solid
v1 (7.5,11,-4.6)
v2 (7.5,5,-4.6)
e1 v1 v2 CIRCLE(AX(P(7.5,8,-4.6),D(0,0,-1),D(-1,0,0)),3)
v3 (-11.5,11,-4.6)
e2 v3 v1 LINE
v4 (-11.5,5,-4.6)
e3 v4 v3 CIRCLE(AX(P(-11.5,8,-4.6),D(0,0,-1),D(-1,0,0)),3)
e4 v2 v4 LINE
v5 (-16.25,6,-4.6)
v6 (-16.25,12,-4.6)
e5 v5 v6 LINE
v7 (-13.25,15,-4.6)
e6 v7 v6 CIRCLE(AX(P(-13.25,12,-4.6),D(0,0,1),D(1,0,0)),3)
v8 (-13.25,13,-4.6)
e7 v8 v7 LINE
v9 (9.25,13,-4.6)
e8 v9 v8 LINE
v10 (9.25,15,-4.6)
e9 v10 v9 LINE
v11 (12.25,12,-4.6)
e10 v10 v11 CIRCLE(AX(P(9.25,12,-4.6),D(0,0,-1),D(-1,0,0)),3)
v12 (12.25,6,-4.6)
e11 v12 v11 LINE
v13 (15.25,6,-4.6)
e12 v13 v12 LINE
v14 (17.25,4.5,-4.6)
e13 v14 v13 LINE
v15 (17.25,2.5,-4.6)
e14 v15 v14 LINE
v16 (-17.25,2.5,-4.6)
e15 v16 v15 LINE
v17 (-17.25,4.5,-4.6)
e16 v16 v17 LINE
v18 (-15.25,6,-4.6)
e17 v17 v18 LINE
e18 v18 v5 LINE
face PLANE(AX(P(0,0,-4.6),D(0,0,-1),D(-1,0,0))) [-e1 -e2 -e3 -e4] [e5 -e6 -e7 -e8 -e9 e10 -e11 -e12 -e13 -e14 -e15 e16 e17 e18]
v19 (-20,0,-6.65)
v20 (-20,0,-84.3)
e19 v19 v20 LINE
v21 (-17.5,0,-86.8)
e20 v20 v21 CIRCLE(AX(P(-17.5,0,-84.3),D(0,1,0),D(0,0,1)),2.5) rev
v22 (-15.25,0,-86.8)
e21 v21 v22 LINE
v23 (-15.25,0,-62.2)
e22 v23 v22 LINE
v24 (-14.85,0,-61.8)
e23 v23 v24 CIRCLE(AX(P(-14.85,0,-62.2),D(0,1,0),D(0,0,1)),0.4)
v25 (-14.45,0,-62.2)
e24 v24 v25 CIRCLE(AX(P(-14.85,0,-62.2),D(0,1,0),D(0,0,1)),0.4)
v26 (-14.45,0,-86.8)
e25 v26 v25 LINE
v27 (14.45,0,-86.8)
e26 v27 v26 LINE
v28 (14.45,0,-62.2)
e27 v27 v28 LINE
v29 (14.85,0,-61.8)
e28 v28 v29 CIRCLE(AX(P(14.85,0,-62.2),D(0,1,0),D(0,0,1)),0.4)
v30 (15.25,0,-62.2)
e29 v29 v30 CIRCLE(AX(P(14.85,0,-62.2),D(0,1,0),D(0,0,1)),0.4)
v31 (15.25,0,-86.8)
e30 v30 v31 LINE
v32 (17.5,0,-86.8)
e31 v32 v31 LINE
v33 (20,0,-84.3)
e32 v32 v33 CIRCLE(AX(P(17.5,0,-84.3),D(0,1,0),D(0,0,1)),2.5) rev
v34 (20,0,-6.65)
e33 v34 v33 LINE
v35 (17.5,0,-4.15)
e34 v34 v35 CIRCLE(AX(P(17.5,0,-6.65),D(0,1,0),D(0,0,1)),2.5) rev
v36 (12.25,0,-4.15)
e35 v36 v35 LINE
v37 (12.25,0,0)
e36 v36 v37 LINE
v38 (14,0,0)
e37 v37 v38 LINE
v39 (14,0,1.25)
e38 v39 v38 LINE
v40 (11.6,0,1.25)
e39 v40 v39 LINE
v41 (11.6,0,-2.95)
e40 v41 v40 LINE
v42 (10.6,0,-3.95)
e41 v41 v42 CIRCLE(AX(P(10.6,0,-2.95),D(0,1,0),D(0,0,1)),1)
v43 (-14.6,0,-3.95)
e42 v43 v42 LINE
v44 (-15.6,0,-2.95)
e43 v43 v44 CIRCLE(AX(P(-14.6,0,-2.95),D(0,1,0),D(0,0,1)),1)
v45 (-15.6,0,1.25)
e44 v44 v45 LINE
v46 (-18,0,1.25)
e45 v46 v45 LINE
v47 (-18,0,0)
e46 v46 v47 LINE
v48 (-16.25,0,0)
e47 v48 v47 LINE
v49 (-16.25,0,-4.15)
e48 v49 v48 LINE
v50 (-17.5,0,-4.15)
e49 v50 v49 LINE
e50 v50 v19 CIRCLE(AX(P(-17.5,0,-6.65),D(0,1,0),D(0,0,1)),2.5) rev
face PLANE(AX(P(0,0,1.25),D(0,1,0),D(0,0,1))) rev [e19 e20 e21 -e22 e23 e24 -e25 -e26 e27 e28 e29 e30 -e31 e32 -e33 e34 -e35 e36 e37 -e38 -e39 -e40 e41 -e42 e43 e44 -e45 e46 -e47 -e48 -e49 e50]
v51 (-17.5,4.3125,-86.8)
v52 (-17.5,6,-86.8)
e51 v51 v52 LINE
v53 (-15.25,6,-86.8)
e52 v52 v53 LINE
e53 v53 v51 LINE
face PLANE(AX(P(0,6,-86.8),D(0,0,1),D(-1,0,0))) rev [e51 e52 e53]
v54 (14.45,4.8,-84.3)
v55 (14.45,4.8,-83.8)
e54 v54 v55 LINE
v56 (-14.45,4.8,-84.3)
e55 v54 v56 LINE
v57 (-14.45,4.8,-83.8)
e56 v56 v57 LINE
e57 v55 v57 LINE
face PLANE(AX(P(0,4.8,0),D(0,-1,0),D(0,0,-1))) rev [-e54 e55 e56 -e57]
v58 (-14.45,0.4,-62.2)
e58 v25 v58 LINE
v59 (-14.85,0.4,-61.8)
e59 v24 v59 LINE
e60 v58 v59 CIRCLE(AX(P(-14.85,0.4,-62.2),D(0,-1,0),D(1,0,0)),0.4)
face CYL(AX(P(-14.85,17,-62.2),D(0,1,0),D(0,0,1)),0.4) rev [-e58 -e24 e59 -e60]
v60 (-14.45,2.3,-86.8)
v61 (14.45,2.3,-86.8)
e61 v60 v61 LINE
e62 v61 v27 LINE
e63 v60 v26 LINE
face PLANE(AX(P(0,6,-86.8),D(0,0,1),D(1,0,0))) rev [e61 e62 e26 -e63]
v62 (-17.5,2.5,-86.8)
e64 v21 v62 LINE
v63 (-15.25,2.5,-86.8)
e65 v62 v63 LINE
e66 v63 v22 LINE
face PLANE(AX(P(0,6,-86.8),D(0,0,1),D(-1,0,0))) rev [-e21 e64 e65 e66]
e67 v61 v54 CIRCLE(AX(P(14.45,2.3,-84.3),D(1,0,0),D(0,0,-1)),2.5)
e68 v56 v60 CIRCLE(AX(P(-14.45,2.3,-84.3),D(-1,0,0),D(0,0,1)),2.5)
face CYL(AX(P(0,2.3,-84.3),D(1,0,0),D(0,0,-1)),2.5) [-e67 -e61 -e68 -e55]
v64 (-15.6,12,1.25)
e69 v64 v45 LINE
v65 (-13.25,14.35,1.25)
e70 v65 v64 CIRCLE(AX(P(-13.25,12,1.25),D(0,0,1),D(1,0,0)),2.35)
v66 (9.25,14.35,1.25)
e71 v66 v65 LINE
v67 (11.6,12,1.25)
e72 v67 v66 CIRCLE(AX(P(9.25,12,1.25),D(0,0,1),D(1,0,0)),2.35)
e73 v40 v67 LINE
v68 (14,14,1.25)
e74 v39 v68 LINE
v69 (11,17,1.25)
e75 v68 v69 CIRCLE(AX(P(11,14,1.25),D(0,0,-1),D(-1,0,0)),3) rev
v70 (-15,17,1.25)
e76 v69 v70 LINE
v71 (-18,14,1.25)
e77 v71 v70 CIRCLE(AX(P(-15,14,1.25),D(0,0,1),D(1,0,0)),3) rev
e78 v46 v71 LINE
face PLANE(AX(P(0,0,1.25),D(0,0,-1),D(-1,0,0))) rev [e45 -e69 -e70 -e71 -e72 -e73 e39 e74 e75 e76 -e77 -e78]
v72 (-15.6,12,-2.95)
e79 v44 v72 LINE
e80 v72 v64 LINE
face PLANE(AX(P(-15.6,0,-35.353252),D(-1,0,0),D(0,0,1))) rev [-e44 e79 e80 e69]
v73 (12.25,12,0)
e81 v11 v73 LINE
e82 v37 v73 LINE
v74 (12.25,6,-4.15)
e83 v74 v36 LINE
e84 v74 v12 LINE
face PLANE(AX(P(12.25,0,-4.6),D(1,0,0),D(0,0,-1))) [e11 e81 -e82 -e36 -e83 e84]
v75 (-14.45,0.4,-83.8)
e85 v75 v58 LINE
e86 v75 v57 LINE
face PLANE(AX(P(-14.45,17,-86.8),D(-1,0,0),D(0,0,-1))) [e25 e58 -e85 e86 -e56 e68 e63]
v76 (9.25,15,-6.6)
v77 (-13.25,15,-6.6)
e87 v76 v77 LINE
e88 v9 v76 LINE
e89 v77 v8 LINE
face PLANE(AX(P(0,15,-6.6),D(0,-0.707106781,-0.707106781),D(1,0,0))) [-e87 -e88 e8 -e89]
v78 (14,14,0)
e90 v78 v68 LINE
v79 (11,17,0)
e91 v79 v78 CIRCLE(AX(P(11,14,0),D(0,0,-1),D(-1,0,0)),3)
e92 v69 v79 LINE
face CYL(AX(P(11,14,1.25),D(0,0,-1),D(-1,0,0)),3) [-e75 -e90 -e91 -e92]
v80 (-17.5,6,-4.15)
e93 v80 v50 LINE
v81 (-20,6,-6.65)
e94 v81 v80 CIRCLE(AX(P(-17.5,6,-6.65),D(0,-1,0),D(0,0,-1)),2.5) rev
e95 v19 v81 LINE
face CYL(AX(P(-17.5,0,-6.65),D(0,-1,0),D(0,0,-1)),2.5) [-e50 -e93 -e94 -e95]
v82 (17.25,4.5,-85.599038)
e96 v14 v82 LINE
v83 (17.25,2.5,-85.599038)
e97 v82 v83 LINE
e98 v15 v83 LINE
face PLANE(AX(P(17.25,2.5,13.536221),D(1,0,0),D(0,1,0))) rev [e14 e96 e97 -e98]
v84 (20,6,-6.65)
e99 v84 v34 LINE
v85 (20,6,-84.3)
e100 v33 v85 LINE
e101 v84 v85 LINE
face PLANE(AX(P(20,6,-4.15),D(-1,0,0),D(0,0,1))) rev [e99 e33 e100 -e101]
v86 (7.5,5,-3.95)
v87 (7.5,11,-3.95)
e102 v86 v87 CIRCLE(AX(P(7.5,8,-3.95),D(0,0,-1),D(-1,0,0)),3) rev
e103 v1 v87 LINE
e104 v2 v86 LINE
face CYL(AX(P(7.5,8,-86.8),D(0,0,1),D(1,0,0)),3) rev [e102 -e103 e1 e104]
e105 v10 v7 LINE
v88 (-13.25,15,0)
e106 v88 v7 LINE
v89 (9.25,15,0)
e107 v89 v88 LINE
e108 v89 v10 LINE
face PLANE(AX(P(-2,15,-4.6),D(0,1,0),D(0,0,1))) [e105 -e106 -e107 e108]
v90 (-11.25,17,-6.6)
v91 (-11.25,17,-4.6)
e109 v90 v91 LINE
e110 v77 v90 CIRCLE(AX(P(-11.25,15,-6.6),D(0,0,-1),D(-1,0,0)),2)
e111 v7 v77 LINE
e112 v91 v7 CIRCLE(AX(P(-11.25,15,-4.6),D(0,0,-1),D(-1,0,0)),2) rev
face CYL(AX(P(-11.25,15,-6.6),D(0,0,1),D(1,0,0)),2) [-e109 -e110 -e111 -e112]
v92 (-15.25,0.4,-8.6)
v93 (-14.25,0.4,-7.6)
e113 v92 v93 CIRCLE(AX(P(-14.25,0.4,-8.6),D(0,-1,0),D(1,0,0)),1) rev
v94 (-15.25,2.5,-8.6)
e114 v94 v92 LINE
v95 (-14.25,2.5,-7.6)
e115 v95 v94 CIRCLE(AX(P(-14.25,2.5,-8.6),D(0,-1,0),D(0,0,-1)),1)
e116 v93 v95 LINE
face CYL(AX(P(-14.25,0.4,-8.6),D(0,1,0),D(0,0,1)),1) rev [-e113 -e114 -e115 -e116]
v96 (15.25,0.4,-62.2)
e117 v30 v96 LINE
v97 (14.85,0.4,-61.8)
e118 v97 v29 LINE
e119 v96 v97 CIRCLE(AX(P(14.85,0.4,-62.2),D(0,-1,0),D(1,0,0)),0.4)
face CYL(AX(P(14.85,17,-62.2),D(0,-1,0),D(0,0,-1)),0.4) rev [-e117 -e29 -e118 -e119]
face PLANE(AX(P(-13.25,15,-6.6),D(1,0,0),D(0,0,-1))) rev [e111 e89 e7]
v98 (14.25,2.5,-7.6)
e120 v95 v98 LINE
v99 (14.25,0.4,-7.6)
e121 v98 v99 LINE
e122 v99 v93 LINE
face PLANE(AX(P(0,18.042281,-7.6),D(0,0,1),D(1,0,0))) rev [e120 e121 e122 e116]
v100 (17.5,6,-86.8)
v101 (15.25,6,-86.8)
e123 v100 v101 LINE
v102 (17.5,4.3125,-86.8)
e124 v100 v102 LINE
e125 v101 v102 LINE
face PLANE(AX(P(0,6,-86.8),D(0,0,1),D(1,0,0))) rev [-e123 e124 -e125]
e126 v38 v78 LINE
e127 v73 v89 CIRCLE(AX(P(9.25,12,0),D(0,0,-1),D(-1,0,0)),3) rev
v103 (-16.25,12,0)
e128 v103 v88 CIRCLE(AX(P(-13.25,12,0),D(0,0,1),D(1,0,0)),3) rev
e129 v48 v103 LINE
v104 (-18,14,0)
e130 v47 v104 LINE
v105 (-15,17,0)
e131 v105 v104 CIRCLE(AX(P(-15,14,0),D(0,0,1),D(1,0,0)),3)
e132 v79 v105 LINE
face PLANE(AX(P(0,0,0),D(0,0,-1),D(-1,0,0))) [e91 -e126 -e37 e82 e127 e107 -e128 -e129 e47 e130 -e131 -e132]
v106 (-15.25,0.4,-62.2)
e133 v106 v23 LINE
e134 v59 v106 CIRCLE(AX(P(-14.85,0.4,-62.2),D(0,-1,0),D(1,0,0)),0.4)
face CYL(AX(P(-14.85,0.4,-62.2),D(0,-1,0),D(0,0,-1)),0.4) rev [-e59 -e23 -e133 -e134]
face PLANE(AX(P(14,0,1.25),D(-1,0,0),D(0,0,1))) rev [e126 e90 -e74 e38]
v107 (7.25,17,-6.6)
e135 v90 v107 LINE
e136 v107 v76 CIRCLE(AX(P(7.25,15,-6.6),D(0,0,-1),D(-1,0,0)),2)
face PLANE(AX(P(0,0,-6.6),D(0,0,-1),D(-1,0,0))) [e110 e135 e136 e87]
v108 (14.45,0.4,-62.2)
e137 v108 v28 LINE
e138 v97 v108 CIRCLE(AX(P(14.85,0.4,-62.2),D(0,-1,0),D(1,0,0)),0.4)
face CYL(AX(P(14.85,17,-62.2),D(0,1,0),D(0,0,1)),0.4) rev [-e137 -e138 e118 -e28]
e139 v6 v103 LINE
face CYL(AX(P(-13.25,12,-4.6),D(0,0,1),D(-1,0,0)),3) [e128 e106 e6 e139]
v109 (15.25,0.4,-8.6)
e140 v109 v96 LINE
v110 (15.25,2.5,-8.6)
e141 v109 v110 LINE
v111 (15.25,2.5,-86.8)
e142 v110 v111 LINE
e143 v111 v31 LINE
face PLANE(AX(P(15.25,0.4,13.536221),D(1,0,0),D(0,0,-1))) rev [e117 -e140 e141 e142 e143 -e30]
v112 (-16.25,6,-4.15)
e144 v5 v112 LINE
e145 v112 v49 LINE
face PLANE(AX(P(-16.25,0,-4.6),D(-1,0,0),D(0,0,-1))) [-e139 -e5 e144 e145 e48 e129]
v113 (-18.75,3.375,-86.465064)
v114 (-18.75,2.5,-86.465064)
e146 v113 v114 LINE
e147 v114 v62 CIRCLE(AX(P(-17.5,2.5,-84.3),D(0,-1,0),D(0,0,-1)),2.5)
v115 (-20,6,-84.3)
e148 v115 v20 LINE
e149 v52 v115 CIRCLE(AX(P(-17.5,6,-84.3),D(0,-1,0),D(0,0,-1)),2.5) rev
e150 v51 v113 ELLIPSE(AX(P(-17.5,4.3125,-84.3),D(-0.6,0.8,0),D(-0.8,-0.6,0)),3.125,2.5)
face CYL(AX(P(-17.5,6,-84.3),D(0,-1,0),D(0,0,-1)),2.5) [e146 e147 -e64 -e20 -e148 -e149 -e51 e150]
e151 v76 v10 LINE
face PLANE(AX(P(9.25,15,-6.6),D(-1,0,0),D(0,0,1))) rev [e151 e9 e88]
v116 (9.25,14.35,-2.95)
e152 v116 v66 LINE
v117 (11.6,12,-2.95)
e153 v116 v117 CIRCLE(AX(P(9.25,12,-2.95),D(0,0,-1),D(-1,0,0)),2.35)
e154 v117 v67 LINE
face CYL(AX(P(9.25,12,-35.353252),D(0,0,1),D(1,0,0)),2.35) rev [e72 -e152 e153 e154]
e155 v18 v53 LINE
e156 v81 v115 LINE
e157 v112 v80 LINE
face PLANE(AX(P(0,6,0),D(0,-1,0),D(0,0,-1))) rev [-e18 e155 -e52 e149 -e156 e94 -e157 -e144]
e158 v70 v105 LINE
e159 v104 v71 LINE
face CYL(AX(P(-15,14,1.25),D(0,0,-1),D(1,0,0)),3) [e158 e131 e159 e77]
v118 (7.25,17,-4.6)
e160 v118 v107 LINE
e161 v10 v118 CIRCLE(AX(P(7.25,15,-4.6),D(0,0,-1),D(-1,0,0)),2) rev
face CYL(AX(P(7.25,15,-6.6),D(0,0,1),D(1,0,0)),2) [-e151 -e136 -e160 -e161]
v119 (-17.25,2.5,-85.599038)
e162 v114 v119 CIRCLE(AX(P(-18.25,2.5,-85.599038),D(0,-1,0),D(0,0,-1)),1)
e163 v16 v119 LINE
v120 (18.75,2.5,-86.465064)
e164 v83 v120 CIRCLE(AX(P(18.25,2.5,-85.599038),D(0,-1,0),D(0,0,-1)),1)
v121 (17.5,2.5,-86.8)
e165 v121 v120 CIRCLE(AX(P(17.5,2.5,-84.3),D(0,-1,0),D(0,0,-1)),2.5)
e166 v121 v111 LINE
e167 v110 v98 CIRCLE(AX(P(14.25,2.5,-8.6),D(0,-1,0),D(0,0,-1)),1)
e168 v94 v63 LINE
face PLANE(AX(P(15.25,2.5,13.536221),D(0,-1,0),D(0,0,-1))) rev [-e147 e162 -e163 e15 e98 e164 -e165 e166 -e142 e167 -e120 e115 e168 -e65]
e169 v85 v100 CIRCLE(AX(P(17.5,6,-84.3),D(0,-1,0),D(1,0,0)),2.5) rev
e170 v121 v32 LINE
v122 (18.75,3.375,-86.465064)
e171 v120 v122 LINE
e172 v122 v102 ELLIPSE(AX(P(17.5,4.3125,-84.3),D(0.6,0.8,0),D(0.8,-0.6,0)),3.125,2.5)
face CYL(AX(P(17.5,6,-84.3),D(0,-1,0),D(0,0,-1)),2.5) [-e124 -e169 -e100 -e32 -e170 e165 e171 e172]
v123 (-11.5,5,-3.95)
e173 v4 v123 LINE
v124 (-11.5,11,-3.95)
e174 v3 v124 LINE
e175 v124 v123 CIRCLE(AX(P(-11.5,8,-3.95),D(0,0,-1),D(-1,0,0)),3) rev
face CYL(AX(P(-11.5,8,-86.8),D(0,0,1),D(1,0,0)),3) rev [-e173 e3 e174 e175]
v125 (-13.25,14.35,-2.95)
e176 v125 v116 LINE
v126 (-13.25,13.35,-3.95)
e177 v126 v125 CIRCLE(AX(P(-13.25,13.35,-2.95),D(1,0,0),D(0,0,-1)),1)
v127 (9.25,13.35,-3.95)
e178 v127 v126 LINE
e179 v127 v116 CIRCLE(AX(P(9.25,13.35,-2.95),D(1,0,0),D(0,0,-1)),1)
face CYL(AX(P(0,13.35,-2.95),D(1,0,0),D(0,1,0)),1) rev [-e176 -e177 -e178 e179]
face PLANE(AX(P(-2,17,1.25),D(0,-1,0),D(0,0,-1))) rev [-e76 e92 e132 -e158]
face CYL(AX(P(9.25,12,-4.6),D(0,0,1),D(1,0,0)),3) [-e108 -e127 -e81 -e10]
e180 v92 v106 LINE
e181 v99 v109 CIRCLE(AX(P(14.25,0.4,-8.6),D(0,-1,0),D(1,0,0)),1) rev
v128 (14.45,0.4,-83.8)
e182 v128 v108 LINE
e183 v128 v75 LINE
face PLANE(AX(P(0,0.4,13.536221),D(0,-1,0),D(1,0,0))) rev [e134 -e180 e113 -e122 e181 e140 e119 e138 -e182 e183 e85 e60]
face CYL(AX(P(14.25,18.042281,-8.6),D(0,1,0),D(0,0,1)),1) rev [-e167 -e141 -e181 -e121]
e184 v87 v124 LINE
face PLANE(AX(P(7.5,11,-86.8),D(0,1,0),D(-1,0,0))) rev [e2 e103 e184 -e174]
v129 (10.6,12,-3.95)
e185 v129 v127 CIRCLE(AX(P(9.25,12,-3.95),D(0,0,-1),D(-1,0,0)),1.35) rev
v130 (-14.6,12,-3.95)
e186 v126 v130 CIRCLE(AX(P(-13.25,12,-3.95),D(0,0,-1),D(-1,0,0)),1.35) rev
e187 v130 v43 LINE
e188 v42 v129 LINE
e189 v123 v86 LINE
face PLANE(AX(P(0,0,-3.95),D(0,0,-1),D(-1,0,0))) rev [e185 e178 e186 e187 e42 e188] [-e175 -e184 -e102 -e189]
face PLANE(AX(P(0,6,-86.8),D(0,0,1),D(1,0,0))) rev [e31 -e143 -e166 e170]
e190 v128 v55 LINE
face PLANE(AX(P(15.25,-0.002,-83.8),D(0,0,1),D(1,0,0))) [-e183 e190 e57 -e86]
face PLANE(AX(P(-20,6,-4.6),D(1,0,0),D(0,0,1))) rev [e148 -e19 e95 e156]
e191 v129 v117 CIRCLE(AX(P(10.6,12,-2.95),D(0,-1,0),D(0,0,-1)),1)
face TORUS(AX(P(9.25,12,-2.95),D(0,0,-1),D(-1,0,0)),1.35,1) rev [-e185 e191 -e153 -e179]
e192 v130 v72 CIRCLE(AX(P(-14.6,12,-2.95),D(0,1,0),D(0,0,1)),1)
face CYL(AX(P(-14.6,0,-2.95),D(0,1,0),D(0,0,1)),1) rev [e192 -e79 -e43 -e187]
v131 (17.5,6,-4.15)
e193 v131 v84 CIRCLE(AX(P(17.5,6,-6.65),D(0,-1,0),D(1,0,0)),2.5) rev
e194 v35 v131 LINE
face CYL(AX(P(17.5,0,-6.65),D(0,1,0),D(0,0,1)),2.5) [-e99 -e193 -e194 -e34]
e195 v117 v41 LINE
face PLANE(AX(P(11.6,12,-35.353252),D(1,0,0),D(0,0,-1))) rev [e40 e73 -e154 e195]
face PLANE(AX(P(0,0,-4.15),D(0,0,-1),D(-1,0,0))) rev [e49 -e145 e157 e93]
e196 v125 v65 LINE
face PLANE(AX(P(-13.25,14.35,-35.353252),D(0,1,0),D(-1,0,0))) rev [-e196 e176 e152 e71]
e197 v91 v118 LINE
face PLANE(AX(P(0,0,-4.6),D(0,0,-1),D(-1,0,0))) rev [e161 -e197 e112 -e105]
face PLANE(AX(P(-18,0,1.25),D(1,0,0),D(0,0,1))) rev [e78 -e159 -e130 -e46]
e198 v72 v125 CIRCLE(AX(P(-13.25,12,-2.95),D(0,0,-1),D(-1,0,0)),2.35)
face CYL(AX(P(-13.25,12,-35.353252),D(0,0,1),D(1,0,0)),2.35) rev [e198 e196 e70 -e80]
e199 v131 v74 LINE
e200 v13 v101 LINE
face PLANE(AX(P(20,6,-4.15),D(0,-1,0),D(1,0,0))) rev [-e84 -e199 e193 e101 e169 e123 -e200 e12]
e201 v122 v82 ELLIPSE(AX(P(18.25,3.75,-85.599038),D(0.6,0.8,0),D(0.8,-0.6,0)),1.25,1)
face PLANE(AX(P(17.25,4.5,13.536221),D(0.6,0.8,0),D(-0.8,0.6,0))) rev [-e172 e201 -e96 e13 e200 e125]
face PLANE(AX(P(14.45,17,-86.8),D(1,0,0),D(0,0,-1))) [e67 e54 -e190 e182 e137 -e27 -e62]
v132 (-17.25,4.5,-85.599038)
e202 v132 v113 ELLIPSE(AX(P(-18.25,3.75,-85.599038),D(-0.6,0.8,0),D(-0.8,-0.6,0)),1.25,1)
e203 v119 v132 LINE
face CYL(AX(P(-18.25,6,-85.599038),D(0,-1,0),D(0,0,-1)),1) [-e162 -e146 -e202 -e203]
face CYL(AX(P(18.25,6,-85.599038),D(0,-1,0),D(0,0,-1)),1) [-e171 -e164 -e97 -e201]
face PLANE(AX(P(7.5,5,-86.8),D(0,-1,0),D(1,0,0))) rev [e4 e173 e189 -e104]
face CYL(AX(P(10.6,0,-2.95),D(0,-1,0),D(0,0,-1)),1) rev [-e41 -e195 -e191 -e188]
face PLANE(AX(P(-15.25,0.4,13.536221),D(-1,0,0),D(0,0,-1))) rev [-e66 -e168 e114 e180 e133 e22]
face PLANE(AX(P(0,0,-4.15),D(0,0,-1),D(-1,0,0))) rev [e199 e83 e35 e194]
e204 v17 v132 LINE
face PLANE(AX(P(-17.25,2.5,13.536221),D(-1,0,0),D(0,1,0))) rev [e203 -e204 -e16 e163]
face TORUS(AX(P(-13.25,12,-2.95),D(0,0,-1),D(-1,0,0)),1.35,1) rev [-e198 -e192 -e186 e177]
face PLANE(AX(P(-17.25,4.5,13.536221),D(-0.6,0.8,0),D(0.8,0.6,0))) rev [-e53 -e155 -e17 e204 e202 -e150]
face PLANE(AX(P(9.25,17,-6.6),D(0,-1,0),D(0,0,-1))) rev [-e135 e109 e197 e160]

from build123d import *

# Parameters (mm, degrees)
BOSS_EXTRUDE1_DEPTH      = 1.25
SKETCH2_W                = 14.25
SKETCH2_H                = 15
BOSS_EXTRUDE2_DEPTH      = 4.6
FILLET1_R                = 3
SKETCH5_W                = 20
SKETCH5_H                = 82.2
BASE_PLATE_DEPTH         = 6
SLOT_CUT_DEPTH           = 82.2
REAR_TAB_DEPTH           = 4.4
REAR_TAB_DEPTH_BACK      = 0.4
SKETCH8_W                = 15.25
SKETCH8_H                = 3
SKETCH22_W               = 15.25
SKETCH22_H               = 3
FRONT_SUPPORT_RAIL_DEPTH = 2.1
SKETCH23_W               = 0.8
SKETCH23_H               = 25
BEND_SLOT_DEPTH          = 91.682082023
SKETCH20_W               = 7.75
SKETCH20_H               = 6
SKETCH20_W_2             = 4.75
BOSS_EXTRUDE3_DEPTH      = 0.45
FILLET6_R                = 2.5
CUT_EXTRUDE4_DEPTH       = 92.879282213
CUT_EXTRUDE5_DEPTH       = 5.2
FILLET5_R                = 1
FILLET7_R                = 0.4
BOSS_EXTRUDE4_DEPTH      = 2
CHAMFER1_SIZE            = 2
FILLET8_R                = 2


# Some blends are built 0.0001 mm under size
with BuildPart() as part:
    # Sketch1 → Boss-Extrude1 (new body)
    with BuildSketch(Plane.XY):
        Polygon((0, 0), (14, 0), (14, 17), (-2, 17), (-2, 0), align=None)
    extrude(amount=BOSS_EXTRUDE1_DEPTH)

    # Sketch2 → Boss-Extrude2 (add)
    with BuildSketch(Plane.XY):
        with Locations((5.125, 7.5)):
            Rectangle(SKETCH2_W, SKETCH2_H)
    extrude(amount=-BOSS_EXTRUDE2_DEPTH)

    # Fillet1
    fillet1_edges = [part.edges().sort_by_distance(p)[0] for p in [
        (12.25, 15, -2.3),
        (14, 17, 0.625),
    ]]
    fillet(fillet1_edges, radius=FILLET1_R)

    # Mirror1: part across plane


with BuildPart() as body_2:
    # Sketch5 → Base Plate (new body)
    with BuildSketch(Plane(origin=(0, 0, 0), x_dir=(1, 0, 0), z_dir=(0, 1, 0))):
        with Locations((10, 45.7)):
            Rectangle(SKETCH5_W, SKETCH5_H)
    extrude(amount=BASE_PLATE_DEPTH)

    # Sketch18 → Slot Cut (cut)
    with BuildSketch(Plane(origin=(0, 0, -86.8), x_dir=(-1, 0, 0), z_dir=(0, 0, -1))):
        Polygon((0, 0.4), (-15.25, 0.4), (-15.25, 2.5), (-17.25, 2.5), (-17.25, 4.5), (-15.25, 6), (0, 6), align=None)
    extrude(amount=-SLOT_CUT_DEPTH, mode=Mode.SUBTRACT)

    # Sketch8 → Rear Tab (add, two sides: drawn at the far end of the back side and taken through both)
    with BuildSketch(Plane(origin=(0, 0.4, 0), x_dir=(1, 0, 0), z_dir=(0, 1, 0)).offset(-REAR_TAB_DEPTH_BACK)):
        with Locations((7.625, 85.3)):
            Rectangle(SKETCH8_W, SKETCH8_H)
    extrude(amount=REAR_TAB_DEPTH + REAR_TAB_DEPTH_BACK)

    # Sketch22 → Front Support Rail (add)
    with BuildSketch(Plane(origin=(0, 0.4, 0), x_dir=(1, 0, 0), z_dir=(0, 1, 0))):
        with Locations((7.625, 6.1)):
            Rectangle(SKETCH22_W, SKETCH22_H)
    extrude(amount=FRONT_SUPPORT_RAIL_DEPTH)

    # Sketch23 → Bend Slot (cut, through all)
    with BuildSketch(Plane(origin=(0, 0, 0), x_dir=(1, 0, 0), z_dir=(0, 1, 0))):
        with Locations((14.85, 74.3)):
            Rectangle(SKETCH23_W, SKETCH23_H)
    extrude(amount=BEND_SLOT_DEPTH, mode=Mode.SUBTRACT)

    # Mirror2: body 2 across plane


with BuildPart() as part_1:
    add(part.part)
    add(part.part.mirror(Plane(origin=(-2, 0, 1.25), x_dir=(0, 0, 1), z_dir=(1, 0, 0))))



with BuildPart() as body_2_1:
    add(body_2.part)
    add(body_2.part.mirror(Plane(origin=(0, 6, -4.6), x_dir=(0, 0, 1), z_dir=(1, 0, 0))))


with BuildPart() as part_2:
    add(part_1.part)

    add(body_2_1.part)  # Boss-Extrude3 merges body 2
    # Sketch20 → Boss-Extrude3 (add)
    with BuildSketch(Plane.XY.offset(-4.6)):
        with Locations((16.125, 3)):
            Rectangle(SKETCH20_W, SKETCH20_H)
        with Locations((-17.625, 3)):
            Rectangle(SKETCH20_W_2, SKETCH20_H)
    extrude(amount=BOSS_EXTRUDE3_DEPTH)

    # Fillet6
    fillet6_edges = [part_2.edges().sort_by_distance(p)[0] for p in [
        (-20, 3, -4.15),
        (20, 3, -4.15),
        (20, 3, -86.8),
        (0, 4.8, -86.8),
        (-20, 3, -86.8),
    ]]
    fillet(fillet6_edges, radius=FILLET6_R)

    # Sketch15 → Cut-Extrude4 (cut, through all)
    with BuildSketch(Plane.XY.offset(1.25)):
        with BuildLine():
            Line((7.5, 5), (-11.5, 5))
            ThreePointArc((-11.5, 5), (-14.5, 8), (-11.5, 11))
            Line((-11.5, 11), (7.5, 11))
            ThreePointArc((7.5, 11), (10.5, 8), (7.5, 5))
        make_face()
    extrude(amount=-CUT_EXTRUDE4_DEPTH, mode=Mode.SUBTRACT)

    # Sketch16 → Cut-Extrude5 (cut)
    with BuildSketch(Plane.XY.offset(1.25)):
        with BuildLine():
            Line((-15.6, 0), (11.6, 0))
            Line((11.6, 0), (11.6, 12))
            ThreePointArc((11.6, 12), (10.911700936, 13.661700936), (9.25, 14.35))
            Line((9.25, 14.35), (-13.25, 14.35))
            ThreePointArc((-13.25, 14.35), (-14.911700936, 13.661700936), (-15.6, 12))
            Line((-15.6, 12), (-15.6, 0))
        make_face()
    extrude(amount=-CUT_EXTRUDE5_DEPTH, mode=Mode.SUBTRACT)

    # Fillet5
    # the kernel refuses this fillet: 1 mm, written as the material it adds along each edge
    with BuildSketch(Plane(origin=(9.25, 14.35, -3.95), x_dir=(0, -1, 0), z_dir=(-1, 0, 0))) as fillet5_piece_1:
        with BuildLine():
            CenterArc((FILLET5_R, FILLET5_R), FILLET5_R, 180, 90)
            Line((0, FILLET5_R), (0, 0))
            Line((0, 0), (FILLET5_R, 0))
        make_face()
    extrude(amount=22.5)
    with BuildSketch(Plane(origin=(-13.25, 12, -3.95), x_dir=(0, 1, 0), z_dir=(1, 0, 0))) as fillet5_piece_2:
        with BuildLine():
            CenterArc((2.35 - FILLET5_R, FILLET5_R), FILLET5_R, 270, 90)
            Line((2.35, FILLET5_R), (2.35, 0))
            Line((2.35, 0), (2.35 - FILLET5_R, 0))
        make_face()
    revolve(axis=Axis((-13.25, 12, -3.95), (0, 0, 1)), revolution_arc=90)
    with BuildSketch(Plane(origin=(-15.6, 12, -3.95), x_dir=(1, 0, 0), z_dir=(0, -1, 0))) as fillet5_piece_3:
        with BuildLine():
            CenterArc((FILLET5_R, FILLET5_R), FILLET5_R, 180, 90)
            Line((0, FILLET5_R), (0, 0))
            Line((0, 0), (FILLET5_R, 0))
        make_face()
    extrude(amount=12)
    with BuildSketch(Plane(origin=(11.6, 0, -3.95), x_dir=(0, 0, 1), z_dir=(0, 1, 0))) as fillet5_piece_4:
        with BuildLine():
            CenterArc((FILLET5_R, -FILLET5_R), FILLET5_R, 90, 90)
            Line((0, -FILLET5_R), (0, 0))
            Line((0, 0), (FILLET5_R, 0))
        make_face()
    extrude(amount=12)
    with BuildSketch(Plane(origin=(9.25, 12, -3.95), x_dir=(1, 0, 0), z_dir=(0, -1, 0))) as fillet5_piece_5:
        with BuildLine():
            CenterArc((2.35 - FILLET5_R, FILLET5_R), FILLET5_R, 270, 90)
            Line((2.35, FILLET5_R), (2.35, 0))
            Line((2.35, 0), (2.35 - FILLET5_R, 0))
        make_face()
    revolve(axis=Axis((9.25, 12, -3.95), (0, 0, 1)), revolution_arc=90)
    with BuildSketch(Plane(origin=(15.25, 0.4, -7.6), x_dir=(0, 0, -1), z_dir=(0, 1, 0))) as fillet5_piece_6:
        with BuildLine():
            CenterArc((FILLET5_R, FILLET5_R), FILLET5_R, 180, 90)
            Line((0, FILLET5_R), (0, 0))
            Line((0, 0), (FILLET5_R, 0))
        make_face()
    extrude(amount=2.1)
    with BuildSketch(Plane(origin=(-15.25, 0.4, -7.6), x_dir=(0, 0, -1), z_dir=(0, 1, 0))) as fillet5_piece_7:
        with BuildLine():
            CenterArc((FILLET5_R, -FILLET5_R), FILLET5_R, 90, 90)
            Line((0, -FILLET5_R), (0, 0))
            Line((0, 0), (FILLET5_R, 0))
        make_face()
    extrude(amount=2.1)
    # the kernel refuses this fillet: 1 mm, written as the material it takes off along each edge
    with BuildSketch(Plane(origin=(17.25, 2.5, -86.8), x_dir=(0.9759656656854916, -1.7336632852602407e-15, 0.21792434330077798), z_dir=(0, 1, 0))) as fillet5_2_piece_1_section:
        with BuildLine():
            CenterArc((1.237684498, -0.954173231), FILLET5_R, 72.587148881, 120)
            Line((0.261718832, -1.172097575), (0.164122266, -1.193890009))
            Line((0.164122266, -1.193890009), (-0.097596567, -0.021792434))
            Line((-0.097596567, -0.021792434), (-0.021792434, 0.097596567))
            ThreePointArc((-0.021792434, 0.097596567), (0.222198982, 0.152077652), (1.566864795, 0.095417323))
            Line((1.566864795, 0.095417323), (1.536939313, 0))
        make_face()
    fillet5_2_piece_1 = extrude(amount=5.842348283, mode=Mode.PRIVATE)
    fillet5_2_piece_1 = split(fillet5_2_piece_1, bisect_by=Plane(origin=(18.04936, 3.90048, -86.46679556), z_dir=(-0.5999999999999985, -0.8000000000000012, 0)), keep=Keep.TOP, mode=Mode.PRIVATE)
    add(fillet5_2_piece_1, mode=Mode.SUBTRACT)
    with BuildSketch(Plane(origin=(-17.25, 2.5, -86.8), x_dir=(-0.9759656656854916, -1.7336632852602407e-15, 0.21792434330077798), z_dir=(0, 1, 0))) as fillet5_2_piece_2_section:
        with BuildLine():
            CenterArc((1.237684498, 0.954173231), FILLET5_R, 167.412851119, 120)
            Line((0.261718832, 1.172097575), (0.164122266, 1.193890009))
            Line((0.164122266, 1.193890009), (-0.097596567, 0.021792434))
            Line((-0.097596567, 0.021792434), (-0.021792434, -0.097596567))
            ThreePointArc((-0.021792434, -0.097596567), (0.222198982, -0.152077652), (1.566864795, -0.095417323))
            Line((1.566864795, -0.095417323), (1.536939313, 0))
        make_face()
    fillet5_2_piece_2 = extrude(amount=5.842348283, mode=Mode.PRIVATE)
    fillet5_2_piece_2 = split(fillet5_2_piece_2, bisect_by=Plane(origin=(-18.04936, 3.90048, -86.46679556), z_dir=(0.5999999999999985, -0.8000000000000012, 0)), keep=Keep.TOP, mode=Mode.PRIVATE)
    add(fillet5_2_piece_2, mode=Mode.SUBTRACT)

    # Fillet7
    fillet7_edges = [part_2.edges().sort_by_distance(p)[0] for p in [
        (-14.45, 0.2, -61.8),
        (-15.25, 0.2, -61.8),
        (14.45, 0.2, -61.8),
        (15.25, 0.2, -61.8),
    ]]
    fillet(fillet7_edges, radius=FILLET7_R - 0.0001)  # a hair under: the kernel refuses the full size

    # Sketch24 → Boss-Extrude4 (add)
    with BuildSketch(Plane(origin=(0, 0, -4.6), x_dir=(-1, 0, 0), z_dir=(0, 0, -1))):
        Polygon((-9.25, 15), (-9.25, 17), (13.25, 17), (13.25, 15), (13.25, 13), (-9.25, 13), align=None)
    extrude(amount=BOSS_EXTRUDE4_DEPTH)

    # Chamfer1
    chamfer1_edges = [part_2.edges().sort_by_distance(p)[0] for p in [
        (-2, 13, -6.6),
    ]]
    chamfer(chamfer1_edges, length=CHAMFER1_SIZE - 0.0001)  # a hair under: the kernel refuses the full size

    # Fillet8
    fillet8_edges = [part_2.edges().sort_by_distance(p)[0] for p in [
        (-13.25, 17, -5.6),
        (9.25, 17, -5.6),
    ]]
    fillet(fillet8_edges, radius=FILLET8_R)


solid = part_2.part
